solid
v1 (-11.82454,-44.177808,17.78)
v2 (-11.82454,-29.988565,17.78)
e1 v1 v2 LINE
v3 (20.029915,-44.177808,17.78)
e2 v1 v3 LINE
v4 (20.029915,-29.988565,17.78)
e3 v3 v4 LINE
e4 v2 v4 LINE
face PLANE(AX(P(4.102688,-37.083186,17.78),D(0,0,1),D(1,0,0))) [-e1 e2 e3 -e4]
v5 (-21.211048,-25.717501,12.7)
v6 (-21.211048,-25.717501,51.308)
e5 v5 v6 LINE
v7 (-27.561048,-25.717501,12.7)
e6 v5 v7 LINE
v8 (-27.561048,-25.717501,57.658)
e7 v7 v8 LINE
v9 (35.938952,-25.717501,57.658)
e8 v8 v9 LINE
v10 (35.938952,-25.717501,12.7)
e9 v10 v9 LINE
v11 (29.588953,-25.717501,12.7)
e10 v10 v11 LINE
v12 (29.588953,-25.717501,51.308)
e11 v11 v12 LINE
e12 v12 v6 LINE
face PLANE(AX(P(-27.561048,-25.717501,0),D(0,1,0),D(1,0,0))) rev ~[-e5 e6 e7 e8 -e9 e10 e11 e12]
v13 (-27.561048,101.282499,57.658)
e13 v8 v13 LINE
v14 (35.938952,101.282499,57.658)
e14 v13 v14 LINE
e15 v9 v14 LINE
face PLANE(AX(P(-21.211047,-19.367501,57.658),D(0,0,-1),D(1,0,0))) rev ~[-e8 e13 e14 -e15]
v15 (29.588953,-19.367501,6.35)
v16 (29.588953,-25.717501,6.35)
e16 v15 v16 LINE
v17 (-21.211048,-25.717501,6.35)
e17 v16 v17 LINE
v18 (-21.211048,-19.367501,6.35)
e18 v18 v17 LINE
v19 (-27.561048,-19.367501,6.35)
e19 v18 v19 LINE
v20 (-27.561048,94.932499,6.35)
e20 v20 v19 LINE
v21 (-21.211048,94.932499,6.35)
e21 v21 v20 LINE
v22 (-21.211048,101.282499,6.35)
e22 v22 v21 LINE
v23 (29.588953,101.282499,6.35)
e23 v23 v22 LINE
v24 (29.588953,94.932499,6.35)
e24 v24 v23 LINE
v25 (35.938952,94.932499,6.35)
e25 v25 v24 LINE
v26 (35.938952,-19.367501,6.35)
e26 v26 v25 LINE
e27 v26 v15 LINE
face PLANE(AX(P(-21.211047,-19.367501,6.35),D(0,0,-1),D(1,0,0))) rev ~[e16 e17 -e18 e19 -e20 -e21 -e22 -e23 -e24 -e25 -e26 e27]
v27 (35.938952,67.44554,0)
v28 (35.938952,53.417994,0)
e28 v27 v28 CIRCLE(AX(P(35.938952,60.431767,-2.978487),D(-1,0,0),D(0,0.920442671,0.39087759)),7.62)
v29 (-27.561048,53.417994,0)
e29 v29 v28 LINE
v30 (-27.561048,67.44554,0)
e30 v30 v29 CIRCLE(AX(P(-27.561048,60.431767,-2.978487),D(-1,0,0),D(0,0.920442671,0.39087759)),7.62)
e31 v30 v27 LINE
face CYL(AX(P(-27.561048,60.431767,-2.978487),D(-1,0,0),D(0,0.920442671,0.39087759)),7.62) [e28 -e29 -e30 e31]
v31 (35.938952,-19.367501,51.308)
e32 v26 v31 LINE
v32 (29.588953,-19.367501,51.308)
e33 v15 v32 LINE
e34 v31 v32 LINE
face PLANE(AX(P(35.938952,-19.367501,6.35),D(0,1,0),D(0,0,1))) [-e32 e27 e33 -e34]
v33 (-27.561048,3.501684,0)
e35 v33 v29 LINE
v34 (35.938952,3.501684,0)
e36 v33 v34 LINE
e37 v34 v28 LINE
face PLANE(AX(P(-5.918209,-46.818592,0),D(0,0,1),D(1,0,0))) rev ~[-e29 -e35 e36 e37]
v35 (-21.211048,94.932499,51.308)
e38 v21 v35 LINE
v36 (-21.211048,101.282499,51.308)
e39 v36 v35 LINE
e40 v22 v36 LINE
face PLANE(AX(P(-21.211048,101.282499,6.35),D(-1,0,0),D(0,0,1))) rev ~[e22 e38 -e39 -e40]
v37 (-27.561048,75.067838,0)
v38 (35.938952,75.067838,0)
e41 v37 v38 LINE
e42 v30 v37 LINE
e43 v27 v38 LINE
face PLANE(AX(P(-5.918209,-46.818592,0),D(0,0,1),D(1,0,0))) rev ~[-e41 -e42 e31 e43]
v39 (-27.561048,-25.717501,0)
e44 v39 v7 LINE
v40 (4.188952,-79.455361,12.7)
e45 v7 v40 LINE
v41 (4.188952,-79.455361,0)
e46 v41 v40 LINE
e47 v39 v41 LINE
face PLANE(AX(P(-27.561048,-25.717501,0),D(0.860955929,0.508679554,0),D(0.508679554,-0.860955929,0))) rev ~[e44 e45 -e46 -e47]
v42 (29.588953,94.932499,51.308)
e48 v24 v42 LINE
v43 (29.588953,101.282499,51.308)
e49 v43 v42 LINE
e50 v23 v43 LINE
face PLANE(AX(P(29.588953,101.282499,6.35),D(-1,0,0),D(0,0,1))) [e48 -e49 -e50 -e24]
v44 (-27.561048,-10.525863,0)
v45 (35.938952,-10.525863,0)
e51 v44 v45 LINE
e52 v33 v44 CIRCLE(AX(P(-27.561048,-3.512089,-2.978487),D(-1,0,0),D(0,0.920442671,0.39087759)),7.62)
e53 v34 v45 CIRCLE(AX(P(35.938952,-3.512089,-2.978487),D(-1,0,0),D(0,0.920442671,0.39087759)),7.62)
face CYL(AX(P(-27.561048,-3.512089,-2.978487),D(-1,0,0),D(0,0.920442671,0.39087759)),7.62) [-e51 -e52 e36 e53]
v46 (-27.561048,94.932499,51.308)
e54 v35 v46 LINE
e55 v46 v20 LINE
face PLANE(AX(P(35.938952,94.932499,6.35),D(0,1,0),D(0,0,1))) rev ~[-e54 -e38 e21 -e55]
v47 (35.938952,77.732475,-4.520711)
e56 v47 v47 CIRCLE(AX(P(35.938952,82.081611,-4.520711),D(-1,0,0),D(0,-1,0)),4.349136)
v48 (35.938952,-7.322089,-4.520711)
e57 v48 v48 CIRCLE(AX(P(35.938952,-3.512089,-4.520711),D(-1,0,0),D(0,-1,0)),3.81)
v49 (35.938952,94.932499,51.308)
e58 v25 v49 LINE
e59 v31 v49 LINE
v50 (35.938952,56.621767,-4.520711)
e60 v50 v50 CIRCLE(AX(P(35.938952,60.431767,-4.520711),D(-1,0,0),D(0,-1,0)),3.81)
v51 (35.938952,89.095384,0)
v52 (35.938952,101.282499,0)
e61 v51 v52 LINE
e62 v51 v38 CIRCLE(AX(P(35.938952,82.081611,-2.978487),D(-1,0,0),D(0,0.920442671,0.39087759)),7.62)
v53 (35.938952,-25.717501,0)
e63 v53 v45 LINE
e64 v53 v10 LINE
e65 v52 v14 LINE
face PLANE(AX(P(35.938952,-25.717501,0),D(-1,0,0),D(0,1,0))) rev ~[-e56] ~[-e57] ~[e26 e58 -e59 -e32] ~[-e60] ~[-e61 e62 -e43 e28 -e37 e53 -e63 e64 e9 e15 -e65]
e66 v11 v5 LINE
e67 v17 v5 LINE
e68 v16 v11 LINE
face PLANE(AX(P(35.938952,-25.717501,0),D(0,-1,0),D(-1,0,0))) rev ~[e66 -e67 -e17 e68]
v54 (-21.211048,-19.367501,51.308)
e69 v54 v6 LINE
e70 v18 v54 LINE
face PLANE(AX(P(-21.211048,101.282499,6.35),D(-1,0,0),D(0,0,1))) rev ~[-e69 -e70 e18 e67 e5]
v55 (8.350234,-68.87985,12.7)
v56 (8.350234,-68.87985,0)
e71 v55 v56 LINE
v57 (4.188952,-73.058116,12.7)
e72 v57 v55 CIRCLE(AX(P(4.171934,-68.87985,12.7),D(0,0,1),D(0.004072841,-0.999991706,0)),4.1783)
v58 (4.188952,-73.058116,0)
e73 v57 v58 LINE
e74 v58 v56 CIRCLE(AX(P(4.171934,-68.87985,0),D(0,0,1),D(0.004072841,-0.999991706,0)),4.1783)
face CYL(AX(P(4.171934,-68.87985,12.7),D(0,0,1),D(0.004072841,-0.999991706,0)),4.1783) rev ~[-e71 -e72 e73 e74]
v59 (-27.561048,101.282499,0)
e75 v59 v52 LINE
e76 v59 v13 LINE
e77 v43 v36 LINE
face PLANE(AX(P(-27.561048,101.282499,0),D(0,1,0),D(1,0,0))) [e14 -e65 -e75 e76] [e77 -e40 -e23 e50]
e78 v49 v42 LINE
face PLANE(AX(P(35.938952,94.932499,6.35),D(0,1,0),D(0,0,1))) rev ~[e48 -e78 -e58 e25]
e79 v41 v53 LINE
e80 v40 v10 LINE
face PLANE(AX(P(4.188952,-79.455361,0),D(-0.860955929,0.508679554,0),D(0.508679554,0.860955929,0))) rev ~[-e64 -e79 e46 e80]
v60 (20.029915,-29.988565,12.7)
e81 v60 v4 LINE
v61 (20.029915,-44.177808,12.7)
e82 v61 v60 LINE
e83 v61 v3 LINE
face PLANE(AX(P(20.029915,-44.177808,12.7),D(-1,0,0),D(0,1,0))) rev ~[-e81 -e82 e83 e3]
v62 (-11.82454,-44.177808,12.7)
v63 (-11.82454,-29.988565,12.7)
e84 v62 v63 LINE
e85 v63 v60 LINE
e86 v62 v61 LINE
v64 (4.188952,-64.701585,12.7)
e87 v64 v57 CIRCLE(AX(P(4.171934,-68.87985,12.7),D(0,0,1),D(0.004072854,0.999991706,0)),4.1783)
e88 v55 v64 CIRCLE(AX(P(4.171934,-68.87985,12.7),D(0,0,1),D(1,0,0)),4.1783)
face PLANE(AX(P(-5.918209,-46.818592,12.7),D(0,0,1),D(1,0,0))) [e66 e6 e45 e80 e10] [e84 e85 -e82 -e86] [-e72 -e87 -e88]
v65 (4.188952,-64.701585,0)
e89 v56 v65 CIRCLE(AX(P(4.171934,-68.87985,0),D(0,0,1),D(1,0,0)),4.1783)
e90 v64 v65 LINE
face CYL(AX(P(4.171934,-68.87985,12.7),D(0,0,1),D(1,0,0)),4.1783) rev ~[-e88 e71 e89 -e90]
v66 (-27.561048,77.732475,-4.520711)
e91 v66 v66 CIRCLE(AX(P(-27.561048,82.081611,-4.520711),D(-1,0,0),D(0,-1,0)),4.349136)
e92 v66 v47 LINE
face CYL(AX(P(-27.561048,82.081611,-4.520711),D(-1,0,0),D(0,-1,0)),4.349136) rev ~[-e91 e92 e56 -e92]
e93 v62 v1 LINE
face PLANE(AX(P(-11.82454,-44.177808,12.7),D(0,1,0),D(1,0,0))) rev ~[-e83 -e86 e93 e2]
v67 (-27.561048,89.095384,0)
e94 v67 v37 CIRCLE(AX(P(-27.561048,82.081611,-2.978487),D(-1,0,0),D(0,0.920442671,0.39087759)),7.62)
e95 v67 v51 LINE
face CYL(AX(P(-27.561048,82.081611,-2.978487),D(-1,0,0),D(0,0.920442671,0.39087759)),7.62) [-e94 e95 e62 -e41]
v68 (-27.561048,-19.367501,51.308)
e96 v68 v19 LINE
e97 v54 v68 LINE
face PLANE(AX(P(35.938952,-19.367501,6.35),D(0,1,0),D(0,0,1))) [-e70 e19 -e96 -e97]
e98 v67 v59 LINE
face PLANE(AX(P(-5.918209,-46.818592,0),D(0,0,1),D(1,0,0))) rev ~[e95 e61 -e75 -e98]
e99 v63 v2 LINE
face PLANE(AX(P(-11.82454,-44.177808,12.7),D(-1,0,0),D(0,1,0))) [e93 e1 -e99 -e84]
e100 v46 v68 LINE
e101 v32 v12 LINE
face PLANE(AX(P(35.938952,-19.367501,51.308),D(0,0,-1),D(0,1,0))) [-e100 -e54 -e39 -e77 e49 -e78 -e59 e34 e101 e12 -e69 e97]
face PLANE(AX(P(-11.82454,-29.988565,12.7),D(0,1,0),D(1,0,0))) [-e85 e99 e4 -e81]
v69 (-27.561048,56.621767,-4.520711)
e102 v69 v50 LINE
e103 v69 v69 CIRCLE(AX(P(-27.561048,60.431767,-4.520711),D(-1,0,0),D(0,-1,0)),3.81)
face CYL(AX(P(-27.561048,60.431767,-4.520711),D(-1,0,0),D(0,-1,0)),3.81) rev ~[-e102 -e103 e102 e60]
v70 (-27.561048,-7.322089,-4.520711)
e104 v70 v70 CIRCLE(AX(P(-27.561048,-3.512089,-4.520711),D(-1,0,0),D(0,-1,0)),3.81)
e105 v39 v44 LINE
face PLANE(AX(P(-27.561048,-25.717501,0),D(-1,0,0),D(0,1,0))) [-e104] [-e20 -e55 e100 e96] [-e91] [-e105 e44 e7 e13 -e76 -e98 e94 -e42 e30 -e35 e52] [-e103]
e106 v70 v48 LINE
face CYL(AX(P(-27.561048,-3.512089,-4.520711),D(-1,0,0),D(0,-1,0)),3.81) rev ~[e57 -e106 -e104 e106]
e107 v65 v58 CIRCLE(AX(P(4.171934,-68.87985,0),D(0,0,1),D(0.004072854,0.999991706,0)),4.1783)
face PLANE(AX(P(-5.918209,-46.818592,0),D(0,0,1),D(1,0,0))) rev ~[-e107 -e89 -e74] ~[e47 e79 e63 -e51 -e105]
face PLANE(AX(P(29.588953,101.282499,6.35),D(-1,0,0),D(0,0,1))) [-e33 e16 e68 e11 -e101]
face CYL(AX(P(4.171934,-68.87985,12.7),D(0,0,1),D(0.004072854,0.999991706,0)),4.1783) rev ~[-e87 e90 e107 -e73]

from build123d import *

# Parameters (mm, degrees)
F0_W      = 63.5
F0_H      = 127
F1_DEPTH  = 57.658
F2_W      = 50.7999993861
F2_H      = 114.3
F3_DEPTH  = 155.702
F4_W      = 114.3000005424
F4_H      = 44.9580000767
F5_DEPTH  = 96.774
F6_W      = 50.8000007063
F6_H      = 44.9580000767
F7_DEPTH  = 127
F8_DEPTH  = 120.142
F9_DEPTH  = 115.824
F11_DEPTH = 12.7
F13_DEPTH = 25.4
F14_W     = 31.8544553593
F14_H     = 14.1892433167
F15_DEPTH = 5.08
F16_R     = 4.3491356376
F16_R_2   = 3.81
F17_DEPTH = 63.5
F18_DEPTH = 94.488


# Not quite as in the source:
# - after a boolean that leaves OpenCascade's solid faulty, fix() repairs it


with BuildPart() as f1:
    # F0 (on Top) → F1 (new body)
    with BuildSketch(Plane.XY):
        with Locations((4.1889519542, 37.7824994028)):
            Rectangle(F0_W, F0_H)
    extrude(amount=F1_DEPTH)

    # F2 (on face) → F3 (cut)
    with BuildSketch(Plane.XY.offset(57.658)):
        with Locations((4.1889529675, 37.7824994028)):
            Rectangle(F2_W, F2_H)
    extrude(amount=-F3_DEPTH, mode=Mode.SUBTRACT)

    # F4 (on face) → F5 (cut)
    with BuildSketch(Plane.YZ.offset(35.9389519542)):
        with Locations((37.7824991316, 28.8289999616)):
            Rectangle(F4_W, F4_H)
    extrude(amount=-F5_DEPTH, mode=Mode.SUBTRACT)

    # F6 (on face) → F7 (cut)
    with BuildSketch(Plane(origin=(0, 101.2824994028, 0), x_dir=(-1, 0, 0), z_dir=(0, 1, 0))):
        with Locations((-4.1889523074, 28.8289999616)):
            Rectangle(F6_W, F6_H)
    extrude(amount=-F7_DEPTH, mode=Mode.SUBTRACT)

    add(f1.part.fix(), mode=Mode.REPLACE)

    # F8 (add): a face of the model
    f8_faces = [f1.faces().sort_by_distance(p)[0] for p in [
        (4.1889529675, -19.3675005972, 3.1749999616),
    ]]
    extrude(f8_faces, amount=F8_DEPTH)

    # F9 (add): a face of the model
    f9_faces = [f1.faces().sort_by_distance(p)[0] for p in [
        (4.1889529675, -19.3675005972, 54.483),
    ]]
    extrude(f9_faces, amount=F9_DEPTH)

    # F10 (on Top) → F11 (join)
    with BuildSketch(Plane.XY):
        Polygon((4.1889519542, -25.7175005972), (-27.5610480458, -25.7175005972), (4.1889519542, -79.4553607702), align=None)
        Polygon((35.9389519542, -25.7175005972), (4.1889519542, -25.7175005972), (4.1889519542, -79.4553607702), align=None)
    extrude(amount=F11_DEPTH)

    # F12 (on face) → F13 (cut)
    with BuildSketch(Plane.XY.offset(12.7)):
        with BuildLine():
            Line((4.1889519963, -73.0581155537), (4.1889520512, -64.701584864))
            ThreePointArc((4.1889520512, -64.701584864), (-0.0063655555, -68.8798501813), (4.1889519963, -73.0581155537))
        make_face()
        with BuildLine():
            ThreePointArc((4.1889519963, -73.0581155537), (7.1324492077, -71.8283317208), (8.3502344445, -68.8798502088))
            ThreePointArc((8.3502344445, -68.8798502088), (7.1324492271, -65.9313687162), (4.1889520512, -64.701584864))
            Line((4.1889520512, -64.701584864), (4.1889519963, -73.0581155537))
        make_face()
    extrude(amount=-F13_DEPTH, mode=Mode.SUBTRACT)

    # F14 (on face) → F15 (join)
    with BuildSketch(Plane.XY.offset(12.7)):
        with Locations((4.1026878171, -37.0831862092)):
            Rectangle(F14_W, F14_H)
    extrude(amount=F15_DEPTH)

    # F16 (on face) → F17 (join)
    with BuildSketch(Plane(origin=(-27.5610480458, 0, 0), x_dir=(0, -1, 0), z_dir=(-1, 0, 0))):
        with BuildLine():
            Line((-75.0678375838, 0), (-89.0953838825, 0))
            ThreePointArc((-89.0953838825, 0), (-82.0816107331, -10.598487235), (-75.0678375838, 0))
        make_face()
        with Locations((-82.0816107331, -4.520711489)):
            Circle(F16_R, mode=Mode.SUBTRACT)
        with BuildLine():
            Line((-53.4179941057, 0), (-67.4455404045, 0))
            ThreePointArc((-67.4455404045, 0), (-60.4317672551, -10.598487235), (-53.4179941057, 0))
        make_face()
        with Locations((-60.4317672551, -4.520711489)):
            Circle(F16_R_2, mode=Mode.SUBTRACT)
        with BuildLine():
            Line((10.5258625229, 0), (-3.5016837758, 0))
            ThreePointArc((-3.5016837758, 0), (3.5120893735, -10.598487235), (10.5258625229, 0))
        make_face()
        with Locations((3.5120893735, -4.520711489)):
            Circle(F16_R_2, mode=Mode.SUBTRACT)
        with Locations((-82.0816107331, -4.520711489)):
            Circle(F16_R)
        with Locations((-60.4317672551, -4.520711489)):
            Circle(F16_R_2)
        with Locations((3.5120893735, -4.520711489)):
            Circle(F16_R_2)
    extrude(amount=-F17_DEPTH)

    # F16 (on face) → F18 (cut)
    with BuildSketch(Plane(origin=(-27.5610480458, 0, 0), x_dir=(0, -1, 0), z_dir=(-1, 0, 0))):
        with Locations((-82.0816107331, -4.520711489)):
            Circle(F16_R)
        with Locations((-60.4317672551, -4.520711489)):
            Circle(F16_R_2)
        with Locations((3.5120893735, -4.520711489)):
            Circle(F16_R_2)
    extrude(amount=-F18_DEPTH, mode=Mode.SUBTRACT)


solid = f1.part
